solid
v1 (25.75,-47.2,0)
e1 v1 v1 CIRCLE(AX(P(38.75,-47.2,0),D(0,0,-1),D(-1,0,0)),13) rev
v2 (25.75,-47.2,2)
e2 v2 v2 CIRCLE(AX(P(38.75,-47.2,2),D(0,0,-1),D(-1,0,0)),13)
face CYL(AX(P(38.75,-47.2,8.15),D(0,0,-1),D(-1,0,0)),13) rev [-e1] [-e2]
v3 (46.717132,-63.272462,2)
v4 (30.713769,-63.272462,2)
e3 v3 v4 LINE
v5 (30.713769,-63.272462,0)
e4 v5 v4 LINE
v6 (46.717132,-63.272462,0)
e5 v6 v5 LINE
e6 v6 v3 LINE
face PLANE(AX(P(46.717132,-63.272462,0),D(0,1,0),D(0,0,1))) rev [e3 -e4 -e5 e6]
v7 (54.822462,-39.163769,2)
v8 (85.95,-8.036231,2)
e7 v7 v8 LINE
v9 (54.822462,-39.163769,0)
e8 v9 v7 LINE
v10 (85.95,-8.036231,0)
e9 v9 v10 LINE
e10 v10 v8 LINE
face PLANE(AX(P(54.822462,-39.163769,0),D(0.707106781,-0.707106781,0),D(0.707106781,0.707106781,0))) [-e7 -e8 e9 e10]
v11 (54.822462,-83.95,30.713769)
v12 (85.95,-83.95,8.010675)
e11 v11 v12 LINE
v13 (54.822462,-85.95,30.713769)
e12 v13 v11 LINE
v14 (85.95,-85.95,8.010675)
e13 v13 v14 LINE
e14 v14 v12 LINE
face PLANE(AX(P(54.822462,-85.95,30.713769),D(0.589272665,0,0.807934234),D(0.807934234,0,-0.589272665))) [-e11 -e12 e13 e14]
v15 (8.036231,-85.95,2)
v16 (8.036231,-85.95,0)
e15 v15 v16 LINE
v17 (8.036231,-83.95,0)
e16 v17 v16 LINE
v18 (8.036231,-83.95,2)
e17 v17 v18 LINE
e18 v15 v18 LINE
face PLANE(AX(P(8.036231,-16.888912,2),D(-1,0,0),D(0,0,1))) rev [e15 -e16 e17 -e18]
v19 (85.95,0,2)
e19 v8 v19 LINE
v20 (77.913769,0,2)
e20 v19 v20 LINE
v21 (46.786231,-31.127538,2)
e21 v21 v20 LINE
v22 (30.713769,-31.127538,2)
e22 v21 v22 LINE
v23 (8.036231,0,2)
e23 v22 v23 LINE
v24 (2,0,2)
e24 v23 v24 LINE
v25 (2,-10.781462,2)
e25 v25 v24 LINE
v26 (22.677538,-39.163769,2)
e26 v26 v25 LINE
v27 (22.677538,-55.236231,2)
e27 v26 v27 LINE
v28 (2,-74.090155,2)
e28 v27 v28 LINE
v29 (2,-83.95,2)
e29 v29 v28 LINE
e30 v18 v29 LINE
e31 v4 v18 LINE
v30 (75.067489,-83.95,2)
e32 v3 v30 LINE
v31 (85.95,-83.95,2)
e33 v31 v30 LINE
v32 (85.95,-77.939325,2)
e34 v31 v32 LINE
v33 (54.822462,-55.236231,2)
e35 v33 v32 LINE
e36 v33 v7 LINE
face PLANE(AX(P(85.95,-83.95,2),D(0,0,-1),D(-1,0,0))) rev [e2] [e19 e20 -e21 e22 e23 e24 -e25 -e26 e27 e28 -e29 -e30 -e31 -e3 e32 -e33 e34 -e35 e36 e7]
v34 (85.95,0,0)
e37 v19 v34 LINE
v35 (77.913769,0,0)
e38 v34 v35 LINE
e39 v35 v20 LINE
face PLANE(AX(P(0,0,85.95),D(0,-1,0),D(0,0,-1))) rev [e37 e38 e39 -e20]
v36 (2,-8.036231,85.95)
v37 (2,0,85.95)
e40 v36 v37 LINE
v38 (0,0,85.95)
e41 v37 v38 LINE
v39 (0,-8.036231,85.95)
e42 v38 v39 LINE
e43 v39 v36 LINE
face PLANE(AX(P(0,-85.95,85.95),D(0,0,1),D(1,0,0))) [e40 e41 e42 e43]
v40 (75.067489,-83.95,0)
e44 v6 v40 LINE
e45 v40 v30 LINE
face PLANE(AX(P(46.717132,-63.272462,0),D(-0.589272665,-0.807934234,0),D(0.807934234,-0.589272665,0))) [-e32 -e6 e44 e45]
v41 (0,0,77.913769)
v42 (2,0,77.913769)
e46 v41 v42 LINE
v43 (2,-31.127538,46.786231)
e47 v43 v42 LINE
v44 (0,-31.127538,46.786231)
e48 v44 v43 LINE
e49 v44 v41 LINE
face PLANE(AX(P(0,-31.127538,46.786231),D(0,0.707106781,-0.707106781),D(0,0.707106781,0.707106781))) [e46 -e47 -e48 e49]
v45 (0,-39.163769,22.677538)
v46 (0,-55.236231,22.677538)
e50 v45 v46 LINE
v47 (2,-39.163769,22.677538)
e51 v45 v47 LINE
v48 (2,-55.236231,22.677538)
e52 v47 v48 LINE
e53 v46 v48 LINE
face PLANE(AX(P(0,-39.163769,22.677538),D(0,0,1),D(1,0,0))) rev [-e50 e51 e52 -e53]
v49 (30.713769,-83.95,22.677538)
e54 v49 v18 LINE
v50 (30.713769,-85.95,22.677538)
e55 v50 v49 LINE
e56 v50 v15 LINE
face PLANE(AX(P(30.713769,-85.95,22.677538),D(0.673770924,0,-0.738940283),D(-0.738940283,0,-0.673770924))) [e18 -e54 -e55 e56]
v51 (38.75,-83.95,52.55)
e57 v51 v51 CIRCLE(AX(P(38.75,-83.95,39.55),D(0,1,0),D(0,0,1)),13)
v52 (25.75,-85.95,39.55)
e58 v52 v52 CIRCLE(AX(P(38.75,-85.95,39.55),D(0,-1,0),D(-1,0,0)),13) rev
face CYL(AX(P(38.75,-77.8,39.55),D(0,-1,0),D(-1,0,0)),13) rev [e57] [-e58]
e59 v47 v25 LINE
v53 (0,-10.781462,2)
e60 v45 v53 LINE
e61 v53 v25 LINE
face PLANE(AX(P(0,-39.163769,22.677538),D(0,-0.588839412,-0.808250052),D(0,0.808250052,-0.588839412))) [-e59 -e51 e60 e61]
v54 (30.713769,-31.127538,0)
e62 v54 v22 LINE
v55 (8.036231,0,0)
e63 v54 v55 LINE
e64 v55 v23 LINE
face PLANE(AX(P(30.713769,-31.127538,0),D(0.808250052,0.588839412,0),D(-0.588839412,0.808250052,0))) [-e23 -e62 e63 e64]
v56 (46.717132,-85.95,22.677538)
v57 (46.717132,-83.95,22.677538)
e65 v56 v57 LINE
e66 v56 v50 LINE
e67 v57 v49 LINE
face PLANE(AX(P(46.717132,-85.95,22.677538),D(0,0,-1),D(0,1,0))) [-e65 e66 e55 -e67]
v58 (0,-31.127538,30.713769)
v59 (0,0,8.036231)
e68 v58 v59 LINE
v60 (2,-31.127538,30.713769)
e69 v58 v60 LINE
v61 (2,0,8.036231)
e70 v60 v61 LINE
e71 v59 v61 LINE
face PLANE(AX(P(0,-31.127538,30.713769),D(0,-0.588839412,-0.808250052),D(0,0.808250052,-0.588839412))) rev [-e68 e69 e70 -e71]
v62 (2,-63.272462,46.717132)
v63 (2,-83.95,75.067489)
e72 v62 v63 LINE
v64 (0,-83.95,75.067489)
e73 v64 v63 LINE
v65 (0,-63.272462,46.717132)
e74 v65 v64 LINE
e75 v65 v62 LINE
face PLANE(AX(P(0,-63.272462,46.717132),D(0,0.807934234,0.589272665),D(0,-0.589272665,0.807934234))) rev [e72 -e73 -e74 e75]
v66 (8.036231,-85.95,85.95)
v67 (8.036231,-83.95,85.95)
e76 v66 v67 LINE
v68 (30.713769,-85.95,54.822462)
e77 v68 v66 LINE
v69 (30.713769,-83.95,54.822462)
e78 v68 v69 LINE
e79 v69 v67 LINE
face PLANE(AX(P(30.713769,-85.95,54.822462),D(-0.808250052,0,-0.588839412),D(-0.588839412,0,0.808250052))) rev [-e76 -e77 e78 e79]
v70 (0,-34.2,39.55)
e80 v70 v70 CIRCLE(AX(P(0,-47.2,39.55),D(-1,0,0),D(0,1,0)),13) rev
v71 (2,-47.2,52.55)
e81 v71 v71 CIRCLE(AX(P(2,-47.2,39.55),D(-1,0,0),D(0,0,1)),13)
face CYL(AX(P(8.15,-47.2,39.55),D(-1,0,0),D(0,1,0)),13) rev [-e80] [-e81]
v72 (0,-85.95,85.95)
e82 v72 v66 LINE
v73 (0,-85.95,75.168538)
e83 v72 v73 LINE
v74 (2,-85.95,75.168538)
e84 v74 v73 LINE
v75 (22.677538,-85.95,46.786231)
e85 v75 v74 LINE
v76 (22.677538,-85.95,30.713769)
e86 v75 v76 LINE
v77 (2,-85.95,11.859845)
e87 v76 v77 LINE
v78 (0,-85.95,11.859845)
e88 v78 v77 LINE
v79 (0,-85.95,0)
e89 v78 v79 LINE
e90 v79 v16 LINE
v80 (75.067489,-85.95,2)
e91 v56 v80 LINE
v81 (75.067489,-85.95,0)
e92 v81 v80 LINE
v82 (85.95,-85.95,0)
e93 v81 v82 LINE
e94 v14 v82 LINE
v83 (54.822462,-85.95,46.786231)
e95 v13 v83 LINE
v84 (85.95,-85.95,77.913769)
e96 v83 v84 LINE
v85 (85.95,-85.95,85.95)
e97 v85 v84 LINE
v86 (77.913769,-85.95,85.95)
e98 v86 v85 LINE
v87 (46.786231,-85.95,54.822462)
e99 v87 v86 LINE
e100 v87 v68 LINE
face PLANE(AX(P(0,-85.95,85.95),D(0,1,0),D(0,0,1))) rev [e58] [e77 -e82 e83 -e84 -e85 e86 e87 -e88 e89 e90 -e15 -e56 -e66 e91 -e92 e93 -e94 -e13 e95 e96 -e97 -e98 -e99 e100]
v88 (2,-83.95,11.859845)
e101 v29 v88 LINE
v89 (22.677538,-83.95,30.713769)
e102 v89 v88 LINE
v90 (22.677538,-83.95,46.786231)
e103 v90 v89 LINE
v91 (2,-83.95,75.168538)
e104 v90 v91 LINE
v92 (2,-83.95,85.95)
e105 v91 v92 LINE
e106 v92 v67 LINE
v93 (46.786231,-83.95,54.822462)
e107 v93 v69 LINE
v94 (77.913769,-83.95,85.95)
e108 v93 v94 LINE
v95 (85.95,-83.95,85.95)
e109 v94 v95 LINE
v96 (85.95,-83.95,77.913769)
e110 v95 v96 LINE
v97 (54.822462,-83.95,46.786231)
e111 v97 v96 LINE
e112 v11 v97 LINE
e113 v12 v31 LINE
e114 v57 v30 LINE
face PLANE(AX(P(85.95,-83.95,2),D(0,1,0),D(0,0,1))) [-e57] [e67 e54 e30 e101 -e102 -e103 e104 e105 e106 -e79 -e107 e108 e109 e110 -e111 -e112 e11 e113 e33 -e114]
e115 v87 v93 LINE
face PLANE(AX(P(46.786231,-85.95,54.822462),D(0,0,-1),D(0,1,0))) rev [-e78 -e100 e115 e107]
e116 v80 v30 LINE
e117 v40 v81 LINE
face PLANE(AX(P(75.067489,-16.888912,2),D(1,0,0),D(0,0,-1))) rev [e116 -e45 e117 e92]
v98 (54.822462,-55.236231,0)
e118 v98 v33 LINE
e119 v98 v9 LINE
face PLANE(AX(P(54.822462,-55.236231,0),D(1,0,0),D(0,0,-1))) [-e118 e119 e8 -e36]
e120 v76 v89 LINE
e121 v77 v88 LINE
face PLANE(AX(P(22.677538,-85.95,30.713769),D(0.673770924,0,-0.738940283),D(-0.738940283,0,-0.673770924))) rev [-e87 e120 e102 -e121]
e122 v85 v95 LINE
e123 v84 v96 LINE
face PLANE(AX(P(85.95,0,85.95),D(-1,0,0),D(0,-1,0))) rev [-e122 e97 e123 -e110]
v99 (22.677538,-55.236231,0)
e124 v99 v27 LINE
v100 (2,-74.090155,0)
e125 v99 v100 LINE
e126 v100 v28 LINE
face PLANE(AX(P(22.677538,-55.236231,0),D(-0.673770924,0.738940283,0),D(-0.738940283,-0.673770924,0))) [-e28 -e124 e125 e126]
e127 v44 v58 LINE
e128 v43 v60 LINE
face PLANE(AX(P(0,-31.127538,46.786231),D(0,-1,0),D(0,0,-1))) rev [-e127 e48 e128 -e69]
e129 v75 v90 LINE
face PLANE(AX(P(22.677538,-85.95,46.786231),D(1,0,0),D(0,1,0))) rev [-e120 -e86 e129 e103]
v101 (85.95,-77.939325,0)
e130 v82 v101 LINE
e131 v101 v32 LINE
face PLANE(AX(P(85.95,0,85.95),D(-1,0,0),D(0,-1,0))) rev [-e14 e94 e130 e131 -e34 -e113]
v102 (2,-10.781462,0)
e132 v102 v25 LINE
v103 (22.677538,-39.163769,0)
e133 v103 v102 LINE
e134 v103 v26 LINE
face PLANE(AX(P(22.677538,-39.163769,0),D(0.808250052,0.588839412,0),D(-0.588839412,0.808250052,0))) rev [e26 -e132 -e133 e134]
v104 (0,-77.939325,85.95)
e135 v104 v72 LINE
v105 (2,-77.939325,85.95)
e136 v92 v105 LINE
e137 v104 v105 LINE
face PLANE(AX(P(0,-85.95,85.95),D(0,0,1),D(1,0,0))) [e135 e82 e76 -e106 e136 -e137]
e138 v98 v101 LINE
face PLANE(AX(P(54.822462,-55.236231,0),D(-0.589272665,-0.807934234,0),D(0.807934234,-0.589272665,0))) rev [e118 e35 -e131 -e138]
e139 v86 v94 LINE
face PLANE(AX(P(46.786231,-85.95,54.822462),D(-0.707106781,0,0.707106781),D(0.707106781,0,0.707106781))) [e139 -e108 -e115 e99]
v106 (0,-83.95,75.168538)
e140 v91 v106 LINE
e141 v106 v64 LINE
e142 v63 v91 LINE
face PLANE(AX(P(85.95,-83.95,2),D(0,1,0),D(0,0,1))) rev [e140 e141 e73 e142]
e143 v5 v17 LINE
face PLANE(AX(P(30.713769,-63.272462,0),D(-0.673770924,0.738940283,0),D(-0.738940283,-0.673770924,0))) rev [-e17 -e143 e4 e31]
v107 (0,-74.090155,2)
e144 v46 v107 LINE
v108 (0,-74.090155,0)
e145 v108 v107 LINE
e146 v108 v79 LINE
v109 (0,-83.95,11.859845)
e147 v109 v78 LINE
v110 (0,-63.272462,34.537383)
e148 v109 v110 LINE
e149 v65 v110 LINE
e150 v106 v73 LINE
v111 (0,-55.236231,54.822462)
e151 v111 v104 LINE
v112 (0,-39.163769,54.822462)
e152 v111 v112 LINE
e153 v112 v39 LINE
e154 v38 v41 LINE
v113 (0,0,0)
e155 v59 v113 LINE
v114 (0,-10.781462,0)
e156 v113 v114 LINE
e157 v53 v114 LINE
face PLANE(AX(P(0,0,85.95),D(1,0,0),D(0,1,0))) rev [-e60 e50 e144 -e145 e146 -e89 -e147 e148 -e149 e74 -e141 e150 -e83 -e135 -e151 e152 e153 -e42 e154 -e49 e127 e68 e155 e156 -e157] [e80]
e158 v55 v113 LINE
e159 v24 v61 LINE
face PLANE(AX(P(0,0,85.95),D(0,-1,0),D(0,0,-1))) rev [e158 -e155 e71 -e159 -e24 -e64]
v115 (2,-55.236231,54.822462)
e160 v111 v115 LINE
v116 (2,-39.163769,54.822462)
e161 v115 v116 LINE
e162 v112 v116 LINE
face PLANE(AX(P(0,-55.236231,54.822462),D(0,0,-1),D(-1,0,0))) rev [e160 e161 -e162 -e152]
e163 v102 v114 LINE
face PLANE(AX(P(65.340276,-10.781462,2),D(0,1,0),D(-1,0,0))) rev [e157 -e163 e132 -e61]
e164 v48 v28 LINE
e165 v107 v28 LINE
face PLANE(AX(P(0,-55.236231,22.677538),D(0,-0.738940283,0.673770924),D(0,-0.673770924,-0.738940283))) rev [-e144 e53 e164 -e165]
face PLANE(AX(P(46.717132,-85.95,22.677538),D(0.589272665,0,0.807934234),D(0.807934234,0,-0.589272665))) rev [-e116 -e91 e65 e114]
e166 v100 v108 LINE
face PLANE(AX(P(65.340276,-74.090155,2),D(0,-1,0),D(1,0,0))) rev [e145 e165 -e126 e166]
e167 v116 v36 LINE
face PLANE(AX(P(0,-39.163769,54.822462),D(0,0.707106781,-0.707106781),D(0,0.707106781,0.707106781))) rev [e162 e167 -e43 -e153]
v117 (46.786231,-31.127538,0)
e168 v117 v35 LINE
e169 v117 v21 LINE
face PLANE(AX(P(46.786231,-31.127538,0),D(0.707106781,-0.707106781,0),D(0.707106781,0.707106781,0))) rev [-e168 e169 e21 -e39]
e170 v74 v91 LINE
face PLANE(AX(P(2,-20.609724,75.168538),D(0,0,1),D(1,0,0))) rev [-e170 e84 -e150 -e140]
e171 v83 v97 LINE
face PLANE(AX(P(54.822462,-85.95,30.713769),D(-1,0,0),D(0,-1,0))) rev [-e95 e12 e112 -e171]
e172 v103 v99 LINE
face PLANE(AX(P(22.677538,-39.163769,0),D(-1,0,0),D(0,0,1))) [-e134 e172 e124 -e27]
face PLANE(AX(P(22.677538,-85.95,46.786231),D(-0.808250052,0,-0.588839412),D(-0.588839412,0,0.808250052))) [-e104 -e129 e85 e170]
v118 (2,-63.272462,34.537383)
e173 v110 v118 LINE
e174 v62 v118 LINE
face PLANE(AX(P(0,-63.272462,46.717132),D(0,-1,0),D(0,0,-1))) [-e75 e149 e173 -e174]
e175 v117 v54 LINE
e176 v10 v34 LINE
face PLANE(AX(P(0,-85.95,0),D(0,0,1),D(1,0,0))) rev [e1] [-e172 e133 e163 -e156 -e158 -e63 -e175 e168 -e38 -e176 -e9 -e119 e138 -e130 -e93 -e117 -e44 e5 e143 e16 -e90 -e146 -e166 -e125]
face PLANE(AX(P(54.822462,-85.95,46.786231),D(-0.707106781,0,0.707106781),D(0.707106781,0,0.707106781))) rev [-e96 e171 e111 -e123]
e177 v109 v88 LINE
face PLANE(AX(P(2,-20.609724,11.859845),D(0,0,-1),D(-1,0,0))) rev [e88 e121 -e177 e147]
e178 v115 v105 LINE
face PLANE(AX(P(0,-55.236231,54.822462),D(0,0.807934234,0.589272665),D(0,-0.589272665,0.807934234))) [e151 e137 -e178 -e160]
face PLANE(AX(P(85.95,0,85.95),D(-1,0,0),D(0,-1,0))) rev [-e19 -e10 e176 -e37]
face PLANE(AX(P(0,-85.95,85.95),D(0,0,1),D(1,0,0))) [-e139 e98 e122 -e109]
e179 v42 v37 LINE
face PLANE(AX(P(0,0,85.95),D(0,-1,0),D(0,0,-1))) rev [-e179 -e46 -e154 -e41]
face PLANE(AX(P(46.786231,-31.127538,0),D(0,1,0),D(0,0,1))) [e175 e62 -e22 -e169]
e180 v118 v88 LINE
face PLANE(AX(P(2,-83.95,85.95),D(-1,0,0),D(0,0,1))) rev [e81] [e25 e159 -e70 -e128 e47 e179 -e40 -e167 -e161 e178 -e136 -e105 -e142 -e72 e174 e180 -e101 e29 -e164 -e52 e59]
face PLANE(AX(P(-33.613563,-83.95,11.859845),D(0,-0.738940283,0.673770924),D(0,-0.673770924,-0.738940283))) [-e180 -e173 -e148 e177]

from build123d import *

# Parameters (mm, degrees)
SKETCH1_W           = 85.95
SKETCH1_H           = 85.95
BOSS_EXTRUDE1_DEPTH = 85.95
SKETCH2_W           = 83.95
SKETCH2_H           = 83.95
CUT_EXTRUDE1_DEPTH  = 83.95
CAVITY1_OUTLINE_R   = 13
CAVITY1_DEPTH       = 2
CAVITY2_OUTLINE_R   = 13
CAVITY2_DEPTH       = 2
CAVITY4_START       = -85.95
CAVITY4_OUTLINE_R   = 13
CAVITY4_DEPTH       = 2
CUT_EXTRUDE3_DEPTH  = 148.724092483
BOSS_EXTRUDE2_DEPTH = 2
CUT_EXTRUDE4_REACH  = 150.87
SKETCH8_W           = 2
SKETCH8_H           = 63.308692683
CUT_EXTRUDE5_REACH  = 150.87
SKETCH9_W           = 67.031257487
SKETCH9_H           = 2
CUT_EXTRUDE6_START  = -2
SKETCH10_W          = 2
SKETCH10_H          = 63.308692683
CUT_EXTRUDE6_DEPTH  = 2


# Read off the part's stored shape, not the designer's step: Cavity1, Cavity2, Cavity4
with BuildPart() as part:
    # Sketch1 → Boss-Extrude1 (new body)
    with BuildSketch(Plane.XY):
        with Locations((42.975, -42.975)):
            Rectangle(SKETCH1_W, SKETCH1_H)
    extrude(amount=BOSS_EXTRUDE1_DEPTH)

    # Sketch2 → Cut-Extrude1 (cut)
    with BuildSketch(Plane(origin=(0, 0, 0), x_dir=(1, 0, 0), z_dir=(0, 1, 0))):
        with Locations((43.975, -43.975)):
            Rectangle(SKETCH2_W, SKETCH2_H)
    extrude(amount=-CUT_EXTRUDE1_DEPTH, mode=Mode.SUBTRACT)

    # Cavity1 outline → Cavity1 (cut)
    with BuildSketch(Plane.XY):
        with Locations((38.75, -47.2)):
            Circle(CAVITY1_OUTLINE_R)
    extrude(amount=CAVITY1_DEPTH, mode=Mode.SUBTRACT)

    # Cavity2 outline → Cavity2 (cut)
    with BuildSketch(Plane.YZ):
        with Locations((-47.2, 39.55)):
            Circle(CAVITY2_OUTLINE_R)
    extrude(amount=CAVITY2_DEPTH, mode=Mode.SUBTRACT)

    # Cavity4 outline → Cavity4 (cut)
    with BuildSketch(Plane(origin=(0, 0, 0), x_dir=(1, 0, 0), z_dir=(0, 1, 0)).offset(CAVITY4_START)):
        with Locations((38.75, -39.55)):
            Circle(CAVITY4_OUTLINE_R)
    extrude(amount=CAVITY4_DEPTH, mode=Mode.SUBTRACT)

    # Sketch4 → Cut-Extrude3 (cut, through all)
    with BuildSketch(Plane.XY.offset(2)):
        Polygon((46.786231243, -31.127537514), (77.913768757, 0), (8.036231243, 0), (30.713768757, -31.127537514), align=None)
        Polygon((54.822462486, -39.163768757), (85.95, -8.036231243), (85.95, -77.939325412), (54.822462486, -55.236231243), align=None)
        Polygon((46.717131732, -63.272462486), (75.06748873, -83.95), (8.036231243, -83.95), (30.713768757, -63.272462486), align=None)
        Polygon((22.677537514, -39.163768757), (2, -10.781462068), (2, -74.090154751), (22.677537514, -55.236231243), align=None)
    cut_extrude3 = extrude(amount=-CUT_EXTRUDE3_DEPTH, mode=Mode.SUBTRACT)

    # Mirror1: Cut-Extrude3 across plane
    add(cut_extrude3.mirror(Plane(origin=(0, -42.975, 42.975), x_dir=(0, 0.7071067811865475, 0.7071067811865477), z_dir=(0, 0.7071067811865476, -0.7071067811865475))), mode=Mode.SUBTRACT)

    # Mirror2: Cut-Extrude3 across plane
    add(cut_extrude3.mirror(Plane(origin=(0, 0, 0), x_dir=(0.7071067811865478, 0, 0.7071067811865472), z_dir=(-0.7071067811865475, 0, 0.7071067811865477))), mode=Mode.SUBTRACT)

    # Sketch6 → Boss-Extrude2 (add)
    with BuildSketch(Plane(origin=(2, 0, 0), x_dir=(0, 0, -1), z_dir=(1, 0, 0))):
        Polygon((-8.036231243, -83.95), (-11.859845249, -83.95), (-34.537382763, -63.272462486), (-30.713768757, -63.272462486), align=None)
    extrude(amount=-BOSS_EXTRUDE2_DEPTH)

    # Cut-Extrude4: up to this face of the body (flat: up to its plane)
    cut_extrude4_end = Plane(part.part.faces().sort_by_distance((18.575077405, -83.95, 13.216062518))[0])
    # Sketch8 → Cut-Extrude4 (cut, up to the picked face)
    with BuildSketch(Plane.XZ.offset(85.95), mode=Mode.PRIVATE) as cut_extrude4_sk1:
        with Locations((1, 43.514191591)):
            Rectangle(SKETCH8_W, SKETCH8_H)
    cut_extrude4_tool1 = split(extrude(cut_extrude4_sk1.sketch, amount=-CUT_EXTRUDE4_REACH, mode=Mode.PRIVATE), bisect_by=cut_extrude4_end, keep=Keep.BOTH, mode=Mode.PRIVATE)
    add(cut_extrude4_tool1.solids().sort_by(Axis((1, -85.95, 43.514192), (0, 1, 0)))[0], mode=Mode.SUBTRACT)

    # Cut-Extrude5: up to this face of the body (flat: up to its plane)
    cut_extrude5_end = Plane(part.part.faces().sort_by_distance((41.551859986, -83.95, 1))[0])
    # Sketch9 → Cut-Extrude5 (cut, up to the picked face)
    with BuildSketch(Plane.XZ.offset(85.95), mode=Mode.PRIVATE) as cut_extrude5_sk1:
        with Locations((41.551859987, 1)):
            Rectangle(SKETCH9_W, SKETCH9_H)
    cut_extrude5_tool1 = split(extrude(cut_extrude5_sk1.sketch, amount=-CUT_EXTRUDE5_REACH, mode=Mode.PRIVATE), bisect_by=cut_extrude5_end, keep=Keep.BOTH, mode=Mode.PRIVATE)
    add(cut_extrude5_tool1.solids().sort_by(Axis((41.55186, -85.95, 1), (0, 1, 0)))[0], mode=Mode.SUBTRACT)

    # Sketch10 → Cut-Extrude6 (cut)
    with BuildSketch(Plane.ZY.offset(CUT_EXTRUDE6_START)):
        with Locations((1, -42.435808409)):
            Rectangle(SKETCH10_W, SKETCH10_H)
    extrude(amount=CUT_EXTRUDE6_DEPTH, mode=Mode.SUBTRACT)


solid = part.part
